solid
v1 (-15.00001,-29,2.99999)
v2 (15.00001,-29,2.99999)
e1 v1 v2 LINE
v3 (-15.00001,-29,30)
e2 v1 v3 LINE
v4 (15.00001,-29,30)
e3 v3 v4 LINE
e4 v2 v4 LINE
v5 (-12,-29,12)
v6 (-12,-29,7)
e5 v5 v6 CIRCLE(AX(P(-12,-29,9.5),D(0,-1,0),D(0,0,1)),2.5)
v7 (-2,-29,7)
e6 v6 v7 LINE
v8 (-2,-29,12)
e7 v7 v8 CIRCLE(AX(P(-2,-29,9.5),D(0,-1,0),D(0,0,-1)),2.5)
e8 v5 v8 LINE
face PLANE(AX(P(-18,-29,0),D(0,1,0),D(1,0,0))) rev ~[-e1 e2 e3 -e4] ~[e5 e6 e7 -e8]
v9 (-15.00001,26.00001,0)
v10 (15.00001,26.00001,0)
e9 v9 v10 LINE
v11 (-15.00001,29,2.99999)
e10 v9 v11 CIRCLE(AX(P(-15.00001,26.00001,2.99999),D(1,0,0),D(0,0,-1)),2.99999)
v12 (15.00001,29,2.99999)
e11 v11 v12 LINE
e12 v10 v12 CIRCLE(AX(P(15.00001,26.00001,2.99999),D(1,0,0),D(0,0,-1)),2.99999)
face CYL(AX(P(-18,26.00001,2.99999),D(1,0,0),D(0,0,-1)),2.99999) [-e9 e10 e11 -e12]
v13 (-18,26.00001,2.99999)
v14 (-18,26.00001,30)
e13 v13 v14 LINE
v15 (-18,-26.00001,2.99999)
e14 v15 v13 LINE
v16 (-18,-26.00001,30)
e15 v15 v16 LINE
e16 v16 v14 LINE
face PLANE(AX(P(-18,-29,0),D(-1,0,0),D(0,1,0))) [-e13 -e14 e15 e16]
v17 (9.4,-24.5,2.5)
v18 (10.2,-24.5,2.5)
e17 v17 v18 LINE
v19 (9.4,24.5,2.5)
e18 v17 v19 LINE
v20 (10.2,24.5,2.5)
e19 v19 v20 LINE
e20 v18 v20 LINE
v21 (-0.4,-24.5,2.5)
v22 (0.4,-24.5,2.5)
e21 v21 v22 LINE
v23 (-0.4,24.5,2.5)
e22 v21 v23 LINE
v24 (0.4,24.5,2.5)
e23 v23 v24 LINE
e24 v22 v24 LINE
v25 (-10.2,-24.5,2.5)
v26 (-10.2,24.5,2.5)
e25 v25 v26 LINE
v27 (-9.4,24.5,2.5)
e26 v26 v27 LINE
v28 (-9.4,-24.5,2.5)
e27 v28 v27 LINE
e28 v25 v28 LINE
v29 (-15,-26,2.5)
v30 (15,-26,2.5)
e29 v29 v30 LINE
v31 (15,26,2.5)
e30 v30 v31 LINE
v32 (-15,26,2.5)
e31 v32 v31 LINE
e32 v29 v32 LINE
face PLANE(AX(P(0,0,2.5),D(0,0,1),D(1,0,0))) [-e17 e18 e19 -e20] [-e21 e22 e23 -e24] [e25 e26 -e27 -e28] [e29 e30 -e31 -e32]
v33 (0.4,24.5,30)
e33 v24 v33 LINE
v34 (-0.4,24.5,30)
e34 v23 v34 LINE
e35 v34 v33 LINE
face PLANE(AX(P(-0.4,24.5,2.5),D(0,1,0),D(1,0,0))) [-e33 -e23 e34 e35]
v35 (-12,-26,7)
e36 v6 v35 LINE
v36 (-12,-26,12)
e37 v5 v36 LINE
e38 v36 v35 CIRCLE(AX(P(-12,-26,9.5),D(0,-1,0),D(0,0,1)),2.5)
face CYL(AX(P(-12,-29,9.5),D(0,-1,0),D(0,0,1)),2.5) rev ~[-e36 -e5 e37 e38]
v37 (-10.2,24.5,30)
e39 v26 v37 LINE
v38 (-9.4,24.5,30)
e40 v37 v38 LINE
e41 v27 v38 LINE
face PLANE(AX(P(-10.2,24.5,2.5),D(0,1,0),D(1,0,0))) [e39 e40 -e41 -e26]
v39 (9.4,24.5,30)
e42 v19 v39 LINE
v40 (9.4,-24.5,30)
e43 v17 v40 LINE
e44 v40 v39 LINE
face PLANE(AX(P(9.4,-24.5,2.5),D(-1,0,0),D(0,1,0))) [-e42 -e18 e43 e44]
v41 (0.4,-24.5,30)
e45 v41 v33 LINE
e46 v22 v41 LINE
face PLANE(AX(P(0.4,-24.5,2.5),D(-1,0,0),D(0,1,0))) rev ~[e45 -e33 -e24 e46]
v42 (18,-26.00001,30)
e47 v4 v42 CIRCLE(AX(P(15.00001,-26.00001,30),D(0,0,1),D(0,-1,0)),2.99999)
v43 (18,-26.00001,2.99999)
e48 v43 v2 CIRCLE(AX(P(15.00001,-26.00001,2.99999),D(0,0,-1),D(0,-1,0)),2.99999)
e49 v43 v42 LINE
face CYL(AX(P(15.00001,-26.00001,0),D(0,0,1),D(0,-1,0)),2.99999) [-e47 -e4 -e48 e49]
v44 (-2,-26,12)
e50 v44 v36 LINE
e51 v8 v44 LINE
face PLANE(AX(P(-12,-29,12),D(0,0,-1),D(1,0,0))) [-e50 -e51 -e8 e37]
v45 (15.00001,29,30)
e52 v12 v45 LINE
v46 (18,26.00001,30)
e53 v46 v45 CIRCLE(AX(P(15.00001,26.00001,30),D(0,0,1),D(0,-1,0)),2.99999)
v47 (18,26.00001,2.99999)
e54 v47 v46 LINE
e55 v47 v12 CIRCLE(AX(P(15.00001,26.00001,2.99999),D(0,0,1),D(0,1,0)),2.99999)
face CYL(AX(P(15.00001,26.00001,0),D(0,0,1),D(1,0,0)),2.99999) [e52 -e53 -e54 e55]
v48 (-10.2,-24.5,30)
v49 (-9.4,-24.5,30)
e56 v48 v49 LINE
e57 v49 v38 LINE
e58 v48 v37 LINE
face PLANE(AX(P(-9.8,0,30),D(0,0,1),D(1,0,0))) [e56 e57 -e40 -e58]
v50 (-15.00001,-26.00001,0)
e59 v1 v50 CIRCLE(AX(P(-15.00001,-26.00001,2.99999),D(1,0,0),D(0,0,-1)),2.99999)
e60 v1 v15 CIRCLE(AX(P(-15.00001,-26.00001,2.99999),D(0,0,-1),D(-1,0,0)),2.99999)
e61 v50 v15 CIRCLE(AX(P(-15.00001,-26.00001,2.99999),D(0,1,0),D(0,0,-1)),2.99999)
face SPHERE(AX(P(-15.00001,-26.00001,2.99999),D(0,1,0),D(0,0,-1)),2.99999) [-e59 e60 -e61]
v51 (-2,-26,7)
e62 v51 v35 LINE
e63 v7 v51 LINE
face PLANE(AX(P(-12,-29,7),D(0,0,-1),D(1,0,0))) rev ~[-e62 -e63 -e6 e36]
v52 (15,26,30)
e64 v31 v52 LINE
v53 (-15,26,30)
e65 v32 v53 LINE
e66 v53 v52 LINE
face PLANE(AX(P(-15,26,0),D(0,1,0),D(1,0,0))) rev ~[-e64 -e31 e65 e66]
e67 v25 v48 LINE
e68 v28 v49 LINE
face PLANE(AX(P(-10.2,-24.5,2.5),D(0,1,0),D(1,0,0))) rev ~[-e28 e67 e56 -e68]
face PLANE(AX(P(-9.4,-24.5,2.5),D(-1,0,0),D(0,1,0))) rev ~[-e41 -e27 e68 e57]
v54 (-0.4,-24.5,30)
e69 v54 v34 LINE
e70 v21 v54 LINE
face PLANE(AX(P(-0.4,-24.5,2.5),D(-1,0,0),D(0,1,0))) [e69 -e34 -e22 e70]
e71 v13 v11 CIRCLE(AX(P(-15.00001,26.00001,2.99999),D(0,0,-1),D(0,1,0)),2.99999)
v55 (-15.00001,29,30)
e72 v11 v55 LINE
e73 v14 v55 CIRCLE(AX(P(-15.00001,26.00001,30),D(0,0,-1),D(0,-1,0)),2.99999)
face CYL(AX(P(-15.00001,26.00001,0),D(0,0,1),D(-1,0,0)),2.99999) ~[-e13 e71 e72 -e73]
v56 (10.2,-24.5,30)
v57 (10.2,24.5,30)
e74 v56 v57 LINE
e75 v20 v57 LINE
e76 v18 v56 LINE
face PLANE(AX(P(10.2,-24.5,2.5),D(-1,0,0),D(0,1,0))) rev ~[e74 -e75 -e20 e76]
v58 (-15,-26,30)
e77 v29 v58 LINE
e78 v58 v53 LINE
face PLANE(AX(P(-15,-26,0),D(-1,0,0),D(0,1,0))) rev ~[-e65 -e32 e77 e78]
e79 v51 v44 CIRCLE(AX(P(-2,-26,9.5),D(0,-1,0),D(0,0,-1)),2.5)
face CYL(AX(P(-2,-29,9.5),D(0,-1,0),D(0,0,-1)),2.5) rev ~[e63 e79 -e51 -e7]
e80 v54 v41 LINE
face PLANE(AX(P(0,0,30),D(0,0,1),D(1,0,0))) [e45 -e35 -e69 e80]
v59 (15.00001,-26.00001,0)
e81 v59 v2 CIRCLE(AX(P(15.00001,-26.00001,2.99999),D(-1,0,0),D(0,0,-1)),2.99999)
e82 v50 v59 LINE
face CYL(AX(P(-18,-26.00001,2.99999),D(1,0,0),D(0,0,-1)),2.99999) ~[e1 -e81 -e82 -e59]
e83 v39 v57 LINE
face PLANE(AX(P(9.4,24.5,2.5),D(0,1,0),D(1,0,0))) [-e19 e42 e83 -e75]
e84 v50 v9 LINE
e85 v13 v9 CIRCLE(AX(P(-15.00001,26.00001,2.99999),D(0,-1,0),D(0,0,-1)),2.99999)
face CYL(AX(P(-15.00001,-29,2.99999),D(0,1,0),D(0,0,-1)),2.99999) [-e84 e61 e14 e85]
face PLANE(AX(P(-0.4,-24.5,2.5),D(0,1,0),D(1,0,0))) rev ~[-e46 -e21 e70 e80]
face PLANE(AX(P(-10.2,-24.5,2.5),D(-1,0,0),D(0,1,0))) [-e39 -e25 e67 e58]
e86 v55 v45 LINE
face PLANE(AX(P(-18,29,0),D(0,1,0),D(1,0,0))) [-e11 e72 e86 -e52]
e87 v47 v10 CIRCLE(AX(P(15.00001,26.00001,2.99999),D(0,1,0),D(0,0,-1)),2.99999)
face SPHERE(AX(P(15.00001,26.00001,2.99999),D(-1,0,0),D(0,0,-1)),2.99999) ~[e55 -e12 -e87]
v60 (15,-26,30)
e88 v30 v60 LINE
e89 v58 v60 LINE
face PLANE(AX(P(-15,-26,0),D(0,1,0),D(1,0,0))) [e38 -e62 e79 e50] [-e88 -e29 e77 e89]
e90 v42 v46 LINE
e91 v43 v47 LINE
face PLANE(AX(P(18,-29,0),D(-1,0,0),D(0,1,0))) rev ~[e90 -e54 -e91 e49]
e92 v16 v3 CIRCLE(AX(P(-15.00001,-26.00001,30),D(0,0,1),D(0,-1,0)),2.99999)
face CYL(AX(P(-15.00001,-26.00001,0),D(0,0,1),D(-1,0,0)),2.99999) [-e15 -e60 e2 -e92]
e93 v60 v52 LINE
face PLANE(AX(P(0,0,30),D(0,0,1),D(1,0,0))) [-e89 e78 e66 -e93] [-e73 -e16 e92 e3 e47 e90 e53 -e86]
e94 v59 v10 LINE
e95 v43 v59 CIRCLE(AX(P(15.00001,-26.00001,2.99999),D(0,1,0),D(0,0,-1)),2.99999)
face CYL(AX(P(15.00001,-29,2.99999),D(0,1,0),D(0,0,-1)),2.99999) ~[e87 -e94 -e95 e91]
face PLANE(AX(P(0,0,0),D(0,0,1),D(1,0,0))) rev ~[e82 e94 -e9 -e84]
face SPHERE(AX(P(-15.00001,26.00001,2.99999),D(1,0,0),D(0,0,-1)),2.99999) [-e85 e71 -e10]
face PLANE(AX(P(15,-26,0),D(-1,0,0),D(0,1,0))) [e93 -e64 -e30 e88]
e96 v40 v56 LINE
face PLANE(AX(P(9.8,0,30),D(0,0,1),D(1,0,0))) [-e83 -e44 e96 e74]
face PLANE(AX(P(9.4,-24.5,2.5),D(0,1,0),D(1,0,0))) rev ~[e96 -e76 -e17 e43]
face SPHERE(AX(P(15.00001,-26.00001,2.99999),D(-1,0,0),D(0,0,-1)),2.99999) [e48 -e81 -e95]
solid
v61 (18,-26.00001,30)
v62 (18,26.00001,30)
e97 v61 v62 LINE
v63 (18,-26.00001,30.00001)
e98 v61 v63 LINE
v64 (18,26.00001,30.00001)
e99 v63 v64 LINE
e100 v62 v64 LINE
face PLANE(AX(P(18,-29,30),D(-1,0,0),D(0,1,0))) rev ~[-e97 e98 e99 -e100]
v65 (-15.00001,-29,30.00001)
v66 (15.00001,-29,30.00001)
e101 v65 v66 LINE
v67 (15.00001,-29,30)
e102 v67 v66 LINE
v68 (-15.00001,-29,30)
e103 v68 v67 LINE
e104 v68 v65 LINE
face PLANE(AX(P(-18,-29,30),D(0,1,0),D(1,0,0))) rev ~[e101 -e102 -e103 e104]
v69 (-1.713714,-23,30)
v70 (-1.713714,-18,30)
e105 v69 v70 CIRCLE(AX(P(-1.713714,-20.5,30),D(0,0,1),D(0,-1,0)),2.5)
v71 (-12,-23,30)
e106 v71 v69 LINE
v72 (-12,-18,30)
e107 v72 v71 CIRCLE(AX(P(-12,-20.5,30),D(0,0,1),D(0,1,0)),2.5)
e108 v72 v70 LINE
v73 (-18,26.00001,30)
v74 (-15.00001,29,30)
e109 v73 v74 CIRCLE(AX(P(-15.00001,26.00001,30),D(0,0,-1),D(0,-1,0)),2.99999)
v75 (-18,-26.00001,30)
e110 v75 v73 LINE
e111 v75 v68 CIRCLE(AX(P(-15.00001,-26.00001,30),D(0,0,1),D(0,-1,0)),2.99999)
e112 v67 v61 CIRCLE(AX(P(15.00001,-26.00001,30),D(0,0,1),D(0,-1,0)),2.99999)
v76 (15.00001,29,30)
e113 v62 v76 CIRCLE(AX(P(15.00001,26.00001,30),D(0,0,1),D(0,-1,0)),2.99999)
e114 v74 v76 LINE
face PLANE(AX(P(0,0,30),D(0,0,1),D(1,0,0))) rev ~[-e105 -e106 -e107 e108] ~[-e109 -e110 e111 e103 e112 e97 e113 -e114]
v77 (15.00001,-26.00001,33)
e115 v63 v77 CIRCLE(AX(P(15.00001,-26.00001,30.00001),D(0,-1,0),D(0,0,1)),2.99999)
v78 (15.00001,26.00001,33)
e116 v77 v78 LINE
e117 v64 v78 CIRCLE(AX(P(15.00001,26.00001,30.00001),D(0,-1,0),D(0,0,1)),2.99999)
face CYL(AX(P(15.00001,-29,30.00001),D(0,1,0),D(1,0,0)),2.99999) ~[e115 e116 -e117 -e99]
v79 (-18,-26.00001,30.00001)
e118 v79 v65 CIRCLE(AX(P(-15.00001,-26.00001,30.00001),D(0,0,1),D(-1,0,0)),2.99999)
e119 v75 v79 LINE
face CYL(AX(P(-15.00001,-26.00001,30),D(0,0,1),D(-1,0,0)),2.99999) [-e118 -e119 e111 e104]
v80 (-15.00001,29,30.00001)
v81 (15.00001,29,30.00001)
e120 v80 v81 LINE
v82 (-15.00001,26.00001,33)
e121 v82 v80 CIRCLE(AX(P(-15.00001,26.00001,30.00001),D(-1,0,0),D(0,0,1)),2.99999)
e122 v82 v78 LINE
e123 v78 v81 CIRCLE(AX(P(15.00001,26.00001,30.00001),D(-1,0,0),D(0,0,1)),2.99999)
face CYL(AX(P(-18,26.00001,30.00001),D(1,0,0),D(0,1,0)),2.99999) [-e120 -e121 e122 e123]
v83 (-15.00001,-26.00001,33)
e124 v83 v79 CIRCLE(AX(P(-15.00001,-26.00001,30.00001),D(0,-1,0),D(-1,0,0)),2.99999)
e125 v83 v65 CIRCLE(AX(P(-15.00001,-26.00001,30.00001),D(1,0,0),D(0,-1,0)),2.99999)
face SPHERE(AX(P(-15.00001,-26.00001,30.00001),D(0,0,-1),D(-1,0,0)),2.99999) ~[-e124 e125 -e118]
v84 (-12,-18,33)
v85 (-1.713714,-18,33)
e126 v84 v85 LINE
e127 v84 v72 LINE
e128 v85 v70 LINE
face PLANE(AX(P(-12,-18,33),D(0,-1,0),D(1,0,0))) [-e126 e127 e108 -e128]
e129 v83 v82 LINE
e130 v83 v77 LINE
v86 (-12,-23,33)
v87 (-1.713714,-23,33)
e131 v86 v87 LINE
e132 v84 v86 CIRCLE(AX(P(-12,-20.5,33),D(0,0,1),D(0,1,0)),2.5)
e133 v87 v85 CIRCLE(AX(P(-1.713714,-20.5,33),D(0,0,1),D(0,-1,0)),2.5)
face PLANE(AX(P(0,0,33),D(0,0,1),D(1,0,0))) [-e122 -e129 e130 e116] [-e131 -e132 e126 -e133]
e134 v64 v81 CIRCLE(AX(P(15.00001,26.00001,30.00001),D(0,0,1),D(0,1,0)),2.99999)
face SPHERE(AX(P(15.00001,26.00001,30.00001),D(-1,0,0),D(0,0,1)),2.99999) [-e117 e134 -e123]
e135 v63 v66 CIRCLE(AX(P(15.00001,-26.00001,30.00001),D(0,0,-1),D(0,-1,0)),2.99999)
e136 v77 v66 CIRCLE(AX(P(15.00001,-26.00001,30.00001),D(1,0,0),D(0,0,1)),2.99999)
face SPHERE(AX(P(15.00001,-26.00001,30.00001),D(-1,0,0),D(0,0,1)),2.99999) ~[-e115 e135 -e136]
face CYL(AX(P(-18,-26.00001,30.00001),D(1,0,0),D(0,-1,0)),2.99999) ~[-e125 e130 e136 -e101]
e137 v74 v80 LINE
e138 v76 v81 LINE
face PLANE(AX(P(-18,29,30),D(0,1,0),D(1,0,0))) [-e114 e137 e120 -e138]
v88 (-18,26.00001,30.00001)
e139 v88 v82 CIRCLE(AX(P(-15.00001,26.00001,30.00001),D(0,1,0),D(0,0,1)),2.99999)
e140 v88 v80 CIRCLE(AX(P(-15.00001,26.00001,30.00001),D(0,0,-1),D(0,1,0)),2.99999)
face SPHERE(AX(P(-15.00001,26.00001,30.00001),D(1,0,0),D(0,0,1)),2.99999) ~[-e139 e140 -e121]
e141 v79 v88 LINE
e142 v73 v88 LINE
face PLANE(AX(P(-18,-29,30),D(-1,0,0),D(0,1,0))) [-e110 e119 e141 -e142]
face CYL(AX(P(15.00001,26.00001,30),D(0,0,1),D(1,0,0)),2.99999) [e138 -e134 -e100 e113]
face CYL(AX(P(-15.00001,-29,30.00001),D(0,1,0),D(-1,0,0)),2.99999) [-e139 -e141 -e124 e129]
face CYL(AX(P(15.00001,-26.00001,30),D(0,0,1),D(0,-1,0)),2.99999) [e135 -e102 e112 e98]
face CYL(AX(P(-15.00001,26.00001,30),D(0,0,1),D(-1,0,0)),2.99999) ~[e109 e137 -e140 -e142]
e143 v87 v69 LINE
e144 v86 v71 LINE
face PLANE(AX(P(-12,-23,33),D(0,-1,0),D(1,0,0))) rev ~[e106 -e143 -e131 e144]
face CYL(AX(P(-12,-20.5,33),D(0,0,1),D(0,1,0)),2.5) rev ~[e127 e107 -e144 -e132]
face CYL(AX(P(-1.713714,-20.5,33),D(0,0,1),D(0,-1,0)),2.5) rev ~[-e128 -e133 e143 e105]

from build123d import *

# Parameters (mm, degrees)
F0_W      = 36
F0_H      = 58
F0_W_2    = 30
F0_H_2    = 52
F1_DEPTH  = 30
F2_DEPTH  = 2.5
F3_W      = 10
F3_H      = 5
F4_DEPTH  = 25
F5_START  = 30
F5_DEPTH  = 3
F6_R      = 2.99999
F6_2_R    = 2.99999
F7_W      = 10.2862860618
F7_H      = 5
F8_DEPTH  = 3
F9_W      = 0.8
F9_H      = 49
F10_DEPTH = 27.5


# Not quite as in the source:
# - a fillet or chamfer is up to 0.001 mm smaller than in the source, because OpenCascade refuses the exact size


with BuildPart() as f1:
    # F0 (on Top) → F1 (new body)
    with BuildSketch(Plane.XY):
        Rectangle(F0_W, F0_H)
        Rectangle(F0_W_2, F0_H_2, mode=Mode.SUBTRACT)
    extrude(amount=F1_DEPTH)

    # F0 (on Top) → F2 (join)
    with BuildSketch(Plane.XY):
        Rectangle(F0_W_2, F0_H_2)
    extrude(amount=F2_DEPTH)

    # F3 (on face) → F4 (cut)
    with BuildSketch(Plane.XZ.offset(29)):
        with Locations((-7, 9.5)):
            Rectangle(F3_W, F3_H)
        with BuildLine():
            Line((-12, 7), (-12, 12))
            ThreePointArc((-12, 12), (-14.5, 9.5), (-12, 7))
        make_face()
        with BuildLine():
            ThreePointArc((-2, 7), (0.5, 9.5), (-2, 12))
            Line((-2, 12), (-2, 7))
        make_face()
    extrude(amount=-F4_DEPTH, mode=Mode.SUBTRACT)

    # F6 (radius 3 in the source; OpenCascade refuses exactly that, so slightly less here)
    f6_edges = [f1.edges().sort_by_distance(p)[0] for p in [
        (0, 29, 0),
        (-18, 0, 0),
        (0, -29, 0),
        (18, 0, 0),
        (-18, -29, 15),
        (18, -29, 15),
        (18, 29, 15),
        (-18, 29, 15),
    ]]
    fillet(f6_edges, radius=F6_R)

    # F9 (on face) → F10 (join)
    with BuildSketch(Plane.XY.offset(2.5)):
        with Locations((-9.8, 0)):
            Rectangle(F9_W, F9_H)
        Rectangle(F9_W, F9_H)
        with Locations((9.8, 0)):
            Rectangle(F9_W, F9_H)
    extrude(amount=F10_DEPTH)


with BuildPart() as f5:
    # F0 (on Top) → F5 (new body)
    with BuildSketch(Plane.XY.offset(F5_START)):
        Rectangle(F0_W, F0_H)
        Rectangle(F0_W_2, F0_H_2, mode=Mode.SUBTRACT)
        Rectangle(F0_W_2, F0_H_2)
    extrude(amount=F5_DEPTH)

    # F6#2 (radius 3 in the source; OpenCascade refuses exactly that, so slightly less here)
    f6_2_edges = [f5.edges().sort_by_distance(p)[0] for p in [
        (-18, -29, 31.5),
        (0, 29, 33),
        (-18, 0, 33),
        (0, -29, 33),
        (18, 0, 33),
        (18, -29, 31.5),
        (18, 29, 31.5),
        (-18, 29, 31.5),
    ]]
    fillet(f6_2_edges, radius=F6_2_R)

    # F7 (on face) → F8 (cut)
    with BuildSketch(Plane.XY.offset(33)):
        with Locations((-6.8568569691, -20.5)):
            Rectangle(F7_W, F7_H)
        with BuildLine():
            Line((-12, -23), (-12, -18))
            ThreePointArc((-12, -18), (-14.5, -20.5), (-12, -23))
        make_face()
        with BuildLine():
            ThreePointArc((-1.7137139382, -23), (0.7862860618, -20.5), (-1.7137139382, -18))
            Line((-1.7137139382, -18), (-1.7137139382, -23))
        make_face()
    extrude(amount=-F8_DEPTH, mode=Mode.SUBTRACT)


solid = Compound([f1.part, f5.part])
